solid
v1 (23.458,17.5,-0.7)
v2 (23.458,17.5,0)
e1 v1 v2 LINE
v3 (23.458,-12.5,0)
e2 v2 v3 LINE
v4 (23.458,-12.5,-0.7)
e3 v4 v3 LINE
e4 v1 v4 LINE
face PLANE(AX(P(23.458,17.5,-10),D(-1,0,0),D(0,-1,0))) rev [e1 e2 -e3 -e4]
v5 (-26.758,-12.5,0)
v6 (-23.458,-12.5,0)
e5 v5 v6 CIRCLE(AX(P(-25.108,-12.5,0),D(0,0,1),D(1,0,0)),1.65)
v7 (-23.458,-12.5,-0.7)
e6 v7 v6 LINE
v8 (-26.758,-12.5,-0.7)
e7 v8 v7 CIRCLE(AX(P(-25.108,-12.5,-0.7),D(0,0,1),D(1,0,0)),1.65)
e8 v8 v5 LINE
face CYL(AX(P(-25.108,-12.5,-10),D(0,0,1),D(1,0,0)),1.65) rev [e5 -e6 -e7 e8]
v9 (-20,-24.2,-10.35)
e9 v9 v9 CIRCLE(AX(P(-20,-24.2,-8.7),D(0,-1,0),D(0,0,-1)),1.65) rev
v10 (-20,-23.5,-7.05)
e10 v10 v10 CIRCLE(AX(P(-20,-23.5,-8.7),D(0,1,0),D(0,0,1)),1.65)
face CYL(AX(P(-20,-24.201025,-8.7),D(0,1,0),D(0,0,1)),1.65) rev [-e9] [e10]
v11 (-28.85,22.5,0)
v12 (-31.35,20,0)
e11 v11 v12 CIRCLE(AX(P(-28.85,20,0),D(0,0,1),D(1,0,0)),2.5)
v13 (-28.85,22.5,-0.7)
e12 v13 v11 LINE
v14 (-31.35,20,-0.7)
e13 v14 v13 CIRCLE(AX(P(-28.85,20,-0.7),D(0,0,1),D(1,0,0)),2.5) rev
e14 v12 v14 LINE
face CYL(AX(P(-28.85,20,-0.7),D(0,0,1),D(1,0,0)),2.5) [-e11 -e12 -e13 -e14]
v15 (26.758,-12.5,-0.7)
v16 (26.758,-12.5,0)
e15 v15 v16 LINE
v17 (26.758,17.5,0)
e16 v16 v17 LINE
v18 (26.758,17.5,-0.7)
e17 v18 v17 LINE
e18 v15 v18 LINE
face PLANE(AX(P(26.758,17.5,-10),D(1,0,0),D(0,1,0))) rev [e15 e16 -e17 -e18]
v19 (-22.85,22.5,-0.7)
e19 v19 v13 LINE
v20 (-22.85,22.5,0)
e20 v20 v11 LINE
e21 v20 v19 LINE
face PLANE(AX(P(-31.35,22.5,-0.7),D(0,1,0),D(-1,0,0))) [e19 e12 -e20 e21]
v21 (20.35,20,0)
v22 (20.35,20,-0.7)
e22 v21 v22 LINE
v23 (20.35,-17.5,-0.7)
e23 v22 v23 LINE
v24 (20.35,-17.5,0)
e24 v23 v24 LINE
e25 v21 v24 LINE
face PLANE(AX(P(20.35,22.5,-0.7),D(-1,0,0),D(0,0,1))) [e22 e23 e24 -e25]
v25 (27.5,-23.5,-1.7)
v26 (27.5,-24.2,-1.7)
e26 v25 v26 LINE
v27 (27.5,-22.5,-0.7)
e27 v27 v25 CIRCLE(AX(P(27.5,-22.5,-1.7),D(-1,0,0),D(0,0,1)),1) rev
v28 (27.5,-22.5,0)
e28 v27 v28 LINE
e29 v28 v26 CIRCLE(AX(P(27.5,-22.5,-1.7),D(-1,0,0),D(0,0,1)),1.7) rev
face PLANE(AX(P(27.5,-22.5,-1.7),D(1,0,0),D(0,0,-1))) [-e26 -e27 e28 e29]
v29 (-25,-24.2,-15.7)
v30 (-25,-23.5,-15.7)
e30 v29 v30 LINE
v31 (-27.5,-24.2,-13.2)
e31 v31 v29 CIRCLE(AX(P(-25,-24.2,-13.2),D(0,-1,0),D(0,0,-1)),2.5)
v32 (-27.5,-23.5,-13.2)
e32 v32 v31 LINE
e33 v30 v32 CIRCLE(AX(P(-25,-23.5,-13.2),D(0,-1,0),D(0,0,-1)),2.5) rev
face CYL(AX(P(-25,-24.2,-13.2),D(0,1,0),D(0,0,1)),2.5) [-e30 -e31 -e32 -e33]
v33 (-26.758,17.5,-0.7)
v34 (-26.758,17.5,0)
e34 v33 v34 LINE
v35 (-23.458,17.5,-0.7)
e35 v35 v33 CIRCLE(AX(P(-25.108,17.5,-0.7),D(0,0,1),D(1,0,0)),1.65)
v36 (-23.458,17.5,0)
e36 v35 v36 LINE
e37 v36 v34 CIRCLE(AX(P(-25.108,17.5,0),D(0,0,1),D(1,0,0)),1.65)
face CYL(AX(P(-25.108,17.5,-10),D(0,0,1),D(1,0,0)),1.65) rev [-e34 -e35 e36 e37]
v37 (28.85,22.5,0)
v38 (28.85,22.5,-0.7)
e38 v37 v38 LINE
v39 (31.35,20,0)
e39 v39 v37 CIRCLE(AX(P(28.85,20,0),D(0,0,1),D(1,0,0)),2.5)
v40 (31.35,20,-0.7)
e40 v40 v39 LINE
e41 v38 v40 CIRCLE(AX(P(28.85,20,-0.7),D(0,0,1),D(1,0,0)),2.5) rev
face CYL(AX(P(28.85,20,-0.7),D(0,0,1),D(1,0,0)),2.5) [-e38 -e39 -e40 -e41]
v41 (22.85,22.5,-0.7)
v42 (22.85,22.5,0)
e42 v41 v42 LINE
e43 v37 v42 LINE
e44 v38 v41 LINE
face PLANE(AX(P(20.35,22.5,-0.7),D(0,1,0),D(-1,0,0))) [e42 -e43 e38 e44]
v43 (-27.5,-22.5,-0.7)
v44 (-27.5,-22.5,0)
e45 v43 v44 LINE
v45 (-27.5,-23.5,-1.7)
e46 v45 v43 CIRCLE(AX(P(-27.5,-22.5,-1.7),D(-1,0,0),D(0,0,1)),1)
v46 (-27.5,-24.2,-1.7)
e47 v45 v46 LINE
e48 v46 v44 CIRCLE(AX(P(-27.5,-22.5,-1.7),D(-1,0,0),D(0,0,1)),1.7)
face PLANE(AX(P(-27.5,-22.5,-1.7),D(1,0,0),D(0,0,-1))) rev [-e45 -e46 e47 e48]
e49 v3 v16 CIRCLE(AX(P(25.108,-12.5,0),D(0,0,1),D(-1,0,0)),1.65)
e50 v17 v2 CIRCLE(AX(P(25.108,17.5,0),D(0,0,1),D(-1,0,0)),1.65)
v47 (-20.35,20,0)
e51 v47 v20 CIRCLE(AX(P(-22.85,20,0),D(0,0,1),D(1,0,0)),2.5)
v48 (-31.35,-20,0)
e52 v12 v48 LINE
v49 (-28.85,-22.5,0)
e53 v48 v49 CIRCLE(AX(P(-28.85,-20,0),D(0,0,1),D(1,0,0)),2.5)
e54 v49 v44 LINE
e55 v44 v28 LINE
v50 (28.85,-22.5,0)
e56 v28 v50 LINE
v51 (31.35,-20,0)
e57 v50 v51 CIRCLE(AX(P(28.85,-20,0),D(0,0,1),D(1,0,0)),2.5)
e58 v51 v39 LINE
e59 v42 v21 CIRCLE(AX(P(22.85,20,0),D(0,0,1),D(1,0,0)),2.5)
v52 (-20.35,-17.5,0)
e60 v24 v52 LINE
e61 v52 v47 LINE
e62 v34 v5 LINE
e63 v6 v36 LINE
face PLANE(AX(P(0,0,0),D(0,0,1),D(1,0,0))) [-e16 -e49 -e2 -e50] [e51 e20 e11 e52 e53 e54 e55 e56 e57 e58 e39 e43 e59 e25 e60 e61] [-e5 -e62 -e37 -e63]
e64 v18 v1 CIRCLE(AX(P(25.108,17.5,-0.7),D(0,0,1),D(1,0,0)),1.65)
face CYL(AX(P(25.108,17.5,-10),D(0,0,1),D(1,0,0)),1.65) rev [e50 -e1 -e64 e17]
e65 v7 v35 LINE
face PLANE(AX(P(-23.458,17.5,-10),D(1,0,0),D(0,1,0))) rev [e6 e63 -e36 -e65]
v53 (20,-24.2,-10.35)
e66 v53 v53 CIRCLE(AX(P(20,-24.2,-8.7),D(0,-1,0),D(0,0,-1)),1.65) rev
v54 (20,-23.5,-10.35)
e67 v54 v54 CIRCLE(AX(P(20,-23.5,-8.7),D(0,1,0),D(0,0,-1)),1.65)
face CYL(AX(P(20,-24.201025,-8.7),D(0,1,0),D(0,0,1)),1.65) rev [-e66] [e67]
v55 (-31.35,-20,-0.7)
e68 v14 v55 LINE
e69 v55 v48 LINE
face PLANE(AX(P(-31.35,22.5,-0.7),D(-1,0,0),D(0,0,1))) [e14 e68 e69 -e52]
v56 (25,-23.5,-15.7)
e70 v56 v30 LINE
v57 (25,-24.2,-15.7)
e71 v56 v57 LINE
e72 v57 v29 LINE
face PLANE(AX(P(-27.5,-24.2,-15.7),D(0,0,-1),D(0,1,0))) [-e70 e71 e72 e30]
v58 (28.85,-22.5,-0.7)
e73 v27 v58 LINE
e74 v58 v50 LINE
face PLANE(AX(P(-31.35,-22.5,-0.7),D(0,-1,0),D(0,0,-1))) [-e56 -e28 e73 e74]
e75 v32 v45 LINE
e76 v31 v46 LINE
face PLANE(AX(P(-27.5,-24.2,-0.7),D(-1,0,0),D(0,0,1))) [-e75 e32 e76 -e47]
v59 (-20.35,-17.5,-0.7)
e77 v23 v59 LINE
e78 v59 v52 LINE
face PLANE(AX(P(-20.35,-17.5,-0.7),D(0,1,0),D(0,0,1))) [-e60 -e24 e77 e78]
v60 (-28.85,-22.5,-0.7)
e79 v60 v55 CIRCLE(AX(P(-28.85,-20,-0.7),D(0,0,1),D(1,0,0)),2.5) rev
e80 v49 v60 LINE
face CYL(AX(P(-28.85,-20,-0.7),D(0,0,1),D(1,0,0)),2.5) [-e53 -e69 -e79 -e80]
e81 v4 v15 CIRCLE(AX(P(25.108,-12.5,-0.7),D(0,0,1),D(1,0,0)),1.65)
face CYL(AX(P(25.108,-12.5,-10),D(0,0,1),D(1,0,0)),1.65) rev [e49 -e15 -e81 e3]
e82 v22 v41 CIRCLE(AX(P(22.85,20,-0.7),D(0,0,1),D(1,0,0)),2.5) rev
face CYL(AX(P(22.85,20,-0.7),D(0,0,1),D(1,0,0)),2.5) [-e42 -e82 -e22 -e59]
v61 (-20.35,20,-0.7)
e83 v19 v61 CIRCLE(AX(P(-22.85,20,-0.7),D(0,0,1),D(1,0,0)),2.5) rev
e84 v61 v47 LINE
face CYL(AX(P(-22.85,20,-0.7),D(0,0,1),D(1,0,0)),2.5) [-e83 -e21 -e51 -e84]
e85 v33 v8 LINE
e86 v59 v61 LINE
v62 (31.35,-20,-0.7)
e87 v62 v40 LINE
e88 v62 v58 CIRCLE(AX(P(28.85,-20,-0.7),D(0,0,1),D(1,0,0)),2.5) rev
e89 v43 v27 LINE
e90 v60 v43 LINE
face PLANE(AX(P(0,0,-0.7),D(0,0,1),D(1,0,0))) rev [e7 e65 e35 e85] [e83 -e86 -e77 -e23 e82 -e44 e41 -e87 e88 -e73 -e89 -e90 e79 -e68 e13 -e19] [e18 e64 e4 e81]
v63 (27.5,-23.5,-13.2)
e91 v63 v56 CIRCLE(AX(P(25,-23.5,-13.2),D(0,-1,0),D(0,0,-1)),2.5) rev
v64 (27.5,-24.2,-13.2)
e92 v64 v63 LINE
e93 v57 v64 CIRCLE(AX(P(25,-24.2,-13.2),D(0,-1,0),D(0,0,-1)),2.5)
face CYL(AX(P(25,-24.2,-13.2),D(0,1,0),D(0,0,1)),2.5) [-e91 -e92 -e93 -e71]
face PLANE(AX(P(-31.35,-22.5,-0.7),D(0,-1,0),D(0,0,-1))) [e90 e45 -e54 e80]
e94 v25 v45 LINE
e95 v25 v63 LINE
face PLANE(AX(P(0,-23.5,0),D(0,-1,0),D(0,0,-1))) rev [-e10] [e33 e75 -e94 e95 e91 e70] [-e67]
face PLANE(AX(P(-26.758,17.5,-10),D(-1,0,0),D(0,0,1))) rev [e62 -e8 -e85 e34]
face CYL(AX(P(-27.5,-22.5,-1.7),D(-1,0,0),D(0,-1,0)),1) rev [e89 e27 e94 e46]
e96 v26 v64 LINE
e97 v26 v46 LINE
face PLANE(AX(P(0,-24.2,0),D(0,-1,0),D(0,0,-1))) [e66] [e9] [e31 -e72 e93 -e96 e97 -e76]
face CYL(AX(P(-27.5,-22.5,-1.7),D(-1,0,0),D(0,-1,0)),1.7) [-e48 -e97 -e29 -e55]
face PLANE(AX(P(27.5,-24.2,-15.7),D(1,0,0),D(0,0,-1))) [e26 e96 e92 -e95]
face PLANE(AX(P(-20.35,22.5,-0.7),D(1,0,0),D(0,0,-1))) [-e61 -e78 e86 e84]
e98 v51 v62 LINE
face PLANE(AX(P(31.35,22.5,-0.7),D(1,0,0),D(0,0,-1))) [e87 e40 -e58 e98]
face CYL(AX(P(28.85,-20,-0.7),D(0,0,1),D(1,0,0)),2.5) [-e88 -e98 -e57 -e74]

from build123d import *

# Parameters (mm, degrees)
BASE_FLANGE1_DEPTH    = 0.7
EDGE_FLANGE1_DEPTH    = 55
CUT_EXTRUDE1_DEPTH    = 10
CUT_EXTRUDE2_REACH    = 59.839
SKETCH9_R             = 1.65
BREAK_CORNER1_START   = -24.2
BREAK_CORNER1_DEPTH   = 0.7
BREAK_CORNER1_START_2 = -0.7
BREAK_CORNER1_2_DEPTH = 0.7


# Read off the part's stored shape, not the designer's step: Break-Corner1
# Sheet-metal steps are written as plain solids
with BuildPart() as part:
    # Sketch2 → Base-Flange1 (new body)
    with BuildSketch(Plane.XY):
        Polygon((20.35, 22.5), (31.35, 22.5), (31.35, -22.5), (-31.35, -22.5), (-31.35, 22.5), (-20.35, 22.5), (-20.35, -17.5), (20.35, -17.5), align=None)
    extrude(amount=-BASE_FLANGE1_DEPTH)

    # Edge-Flange1 section (across the edge) → Edge-Flange1 (add)
    with BuildSketch(Plane(origin=(27.5, -23.5, -0.7), x_dir=(0, 1, 0), z_dir=(-1, 0, 0))):
        with BuildLine():
            Line((-0.7, 1), (-0.7, 15))
            Line((-0.7, 15), (0, 15))
            Line((0, 15), (0, 1))
            ThreePointArc((0, 1), (0.292893219, 0.292893219), (1, 0))
            Line((1, 0), (1, -0.7))
            ThreePointArc((1, -0.7), (-0.202081528, -0.202081528), (-0.7, 1))
        make_face()
    extrude(amount=EDGE_FLANGE1_DEPTH)

    # Sketch8 → Cut-Extrude1 (cut)
    with BuildSketch(Plane.XY):
        with BuildLine():
            Line((-23.458, 17.5), (-23.458, -12.5))
            ThreePointArc((-23.458, -12.5), (-25.108, -14.15), (-26.758, -12.5))
            Line((-26.758, -12.5), (-26.758, 17.5))
            ThreePointArc((-26.758, 17.5), (-25.108, 19.15), (-23.458, 17.5))
        make_face()
        with BuildLine():
            Line((23.458, 17.5), (23.458, -12.5))
            ThreePointArc((23.458, -12.5), (25.108, -14.15), (26.758, -12.5))
            Line((26.758, -12.5), (26.758, 17.5))
            ThreePointArc((26.758, 17.5), (25.108, 19.15), (23.458, 17.5))
        make_face()
    extrude(amount=-CUT_EXTRUDE1_DEPTH, mode=Mode.SUBTRACT)

    # Sketch9 → Cut-Extrude2 (cut, up to next)
    with BuildSketch(Plane(origin=(0, -23.5, 0), x_dir=(1, 0, 0), z_dir=(0, 1, 0)), mode=Mode.PRIVATE) as cut_extrude2_sk1:
        with Locations(Location((-20, 8.7, 0), (0, 0, 270))):
            Circle(SKETCH9_R)
    cut_extrude2_tool1 = extrude(cut_extrude2_sk1.sketch, amount=-CUT_EXTRUDE2_REACH, mode=Mode.PRIVATE) & part.part
    # Sketch9 → Cut-Extrude2 (cut, up to next)
    with BuildSketch(Plane(origin=(0, -23.5, 0), x_dir=(1, 0, 0), z_dir=(0, 1, 0)), mode=Mode.PRIVATE) as cut_extrude2_sk2:
        with Locations(Location((20, 8.7, 0), (0, 0, 90))):
            Circle(SKETCH9_R)
    cut_extrude2_tool2 = extrude(cut_extrude2_sk2.sketch, amount=-CUT_EXTRUDE2_REACH, mode=Mode.PRIVATE) & part.part
    add(cut_extrude2_tool1.solids().sort_by_distance((-20, -23.5, -8.7))[0], mode=Mode.SUBTRACT)
    add(cut_extrude2_tool2.solids().sort_by_distance((20, -23.5, -8.7))[0], mode=Mode.SUBTRACT)

    # Break-Corner1 outline → Break-Corner1 (cut)
    with BuildSketch(Plane(origin=(0, 0, 0), x_dir=(1, 0, 0), z_dir=(0, 1, 0)).offset(BREAK_CORNER1_START)):
        with BuildLine():
            Line((27.5, 15.7), (25, 15.7))
            ThreePointArc((25, 15.7), (26.767766953, 14.967766953), (27.5, 13.2))
            Line((27.5, 13.2), (27.5, 15.7))
        make_face()
        with BuildLine():
            ThreePointArc((-27.5, 13.2), (-26.767766953, 14.967766953), (-25, 15.7))
            Line((-25, 15.7), (-27.5, 15.7))
            Line((-27.5, 15.7), (-27.5, 13.2))
        make_face()
    extrude(amount=BREAK_CORNER1_DEPTH, mode=Mode.SUBTRACT)

    # Break-Corner1 2 outline → Break-Corner1 2 (cut)
    with BuildSketch(Plane.XY.offset(BREAK_CORNER1_START_2)):
        with BuildLine():
            ThreePointArc((20.35, 20), (21.082233047, 21.767766953), (22.85, 22.5))
            Line((22.85, 22.5), (20.35, 22.5))
            Line((20.35, 22.5), (20.35, 20))
        make_face()
        with BuildLine():
            ThreePointArc((28.85, 22.5), (30.617766953, 21.767766953), (31.35, 20))
            Line((31.35, 20), (31.35, 22.5))
            Line((31.35, 22.5), (28.85, 22.5))
        make_face()
        with BuildLine():
            ThreePointArc((31.35, -20), (30.617766953, -21.767766953), (28.85, -22.5))
            Line((28.85, -22.5), (31.35, -22.5))
            Line((31.35, -22.5), (31.35, -20))
        make_face()
        with BuildLine():
            Line((-20.35, 22.5), (-22.85, 22.5))
            ThreePointArc((-22.85, 22.5), (-21.082233047, 21.767766953), (-20.35, 20))
            Line((-20.35, 20), (-20.35, 22.5))
        make_face()
        with BuildLine():
            Line((-31.35, 22.5), (-31.35, 20))
            ThreePointArc((-31.35, 20), (-30.617766953, 21.767766953), (-28.85, 22.5))
            Line((-28.85, 22.5), (-31.35, 22.5))
        make_face()
        with BuildLine():
            ThreePointArc((-28.85, -22.5), (-30.617766953, -21.767766953), (-31.35, -20))
            Line((-31.35, -20), (-31.35, -22.5))
            Line((-31.35, -22.5), (-28.85, -22.5))
        make_face()
    extrude(amount=BREAK_CORNER1_2_DEPTH, mode=Mode.SUBTRACT)


solid = part.part
